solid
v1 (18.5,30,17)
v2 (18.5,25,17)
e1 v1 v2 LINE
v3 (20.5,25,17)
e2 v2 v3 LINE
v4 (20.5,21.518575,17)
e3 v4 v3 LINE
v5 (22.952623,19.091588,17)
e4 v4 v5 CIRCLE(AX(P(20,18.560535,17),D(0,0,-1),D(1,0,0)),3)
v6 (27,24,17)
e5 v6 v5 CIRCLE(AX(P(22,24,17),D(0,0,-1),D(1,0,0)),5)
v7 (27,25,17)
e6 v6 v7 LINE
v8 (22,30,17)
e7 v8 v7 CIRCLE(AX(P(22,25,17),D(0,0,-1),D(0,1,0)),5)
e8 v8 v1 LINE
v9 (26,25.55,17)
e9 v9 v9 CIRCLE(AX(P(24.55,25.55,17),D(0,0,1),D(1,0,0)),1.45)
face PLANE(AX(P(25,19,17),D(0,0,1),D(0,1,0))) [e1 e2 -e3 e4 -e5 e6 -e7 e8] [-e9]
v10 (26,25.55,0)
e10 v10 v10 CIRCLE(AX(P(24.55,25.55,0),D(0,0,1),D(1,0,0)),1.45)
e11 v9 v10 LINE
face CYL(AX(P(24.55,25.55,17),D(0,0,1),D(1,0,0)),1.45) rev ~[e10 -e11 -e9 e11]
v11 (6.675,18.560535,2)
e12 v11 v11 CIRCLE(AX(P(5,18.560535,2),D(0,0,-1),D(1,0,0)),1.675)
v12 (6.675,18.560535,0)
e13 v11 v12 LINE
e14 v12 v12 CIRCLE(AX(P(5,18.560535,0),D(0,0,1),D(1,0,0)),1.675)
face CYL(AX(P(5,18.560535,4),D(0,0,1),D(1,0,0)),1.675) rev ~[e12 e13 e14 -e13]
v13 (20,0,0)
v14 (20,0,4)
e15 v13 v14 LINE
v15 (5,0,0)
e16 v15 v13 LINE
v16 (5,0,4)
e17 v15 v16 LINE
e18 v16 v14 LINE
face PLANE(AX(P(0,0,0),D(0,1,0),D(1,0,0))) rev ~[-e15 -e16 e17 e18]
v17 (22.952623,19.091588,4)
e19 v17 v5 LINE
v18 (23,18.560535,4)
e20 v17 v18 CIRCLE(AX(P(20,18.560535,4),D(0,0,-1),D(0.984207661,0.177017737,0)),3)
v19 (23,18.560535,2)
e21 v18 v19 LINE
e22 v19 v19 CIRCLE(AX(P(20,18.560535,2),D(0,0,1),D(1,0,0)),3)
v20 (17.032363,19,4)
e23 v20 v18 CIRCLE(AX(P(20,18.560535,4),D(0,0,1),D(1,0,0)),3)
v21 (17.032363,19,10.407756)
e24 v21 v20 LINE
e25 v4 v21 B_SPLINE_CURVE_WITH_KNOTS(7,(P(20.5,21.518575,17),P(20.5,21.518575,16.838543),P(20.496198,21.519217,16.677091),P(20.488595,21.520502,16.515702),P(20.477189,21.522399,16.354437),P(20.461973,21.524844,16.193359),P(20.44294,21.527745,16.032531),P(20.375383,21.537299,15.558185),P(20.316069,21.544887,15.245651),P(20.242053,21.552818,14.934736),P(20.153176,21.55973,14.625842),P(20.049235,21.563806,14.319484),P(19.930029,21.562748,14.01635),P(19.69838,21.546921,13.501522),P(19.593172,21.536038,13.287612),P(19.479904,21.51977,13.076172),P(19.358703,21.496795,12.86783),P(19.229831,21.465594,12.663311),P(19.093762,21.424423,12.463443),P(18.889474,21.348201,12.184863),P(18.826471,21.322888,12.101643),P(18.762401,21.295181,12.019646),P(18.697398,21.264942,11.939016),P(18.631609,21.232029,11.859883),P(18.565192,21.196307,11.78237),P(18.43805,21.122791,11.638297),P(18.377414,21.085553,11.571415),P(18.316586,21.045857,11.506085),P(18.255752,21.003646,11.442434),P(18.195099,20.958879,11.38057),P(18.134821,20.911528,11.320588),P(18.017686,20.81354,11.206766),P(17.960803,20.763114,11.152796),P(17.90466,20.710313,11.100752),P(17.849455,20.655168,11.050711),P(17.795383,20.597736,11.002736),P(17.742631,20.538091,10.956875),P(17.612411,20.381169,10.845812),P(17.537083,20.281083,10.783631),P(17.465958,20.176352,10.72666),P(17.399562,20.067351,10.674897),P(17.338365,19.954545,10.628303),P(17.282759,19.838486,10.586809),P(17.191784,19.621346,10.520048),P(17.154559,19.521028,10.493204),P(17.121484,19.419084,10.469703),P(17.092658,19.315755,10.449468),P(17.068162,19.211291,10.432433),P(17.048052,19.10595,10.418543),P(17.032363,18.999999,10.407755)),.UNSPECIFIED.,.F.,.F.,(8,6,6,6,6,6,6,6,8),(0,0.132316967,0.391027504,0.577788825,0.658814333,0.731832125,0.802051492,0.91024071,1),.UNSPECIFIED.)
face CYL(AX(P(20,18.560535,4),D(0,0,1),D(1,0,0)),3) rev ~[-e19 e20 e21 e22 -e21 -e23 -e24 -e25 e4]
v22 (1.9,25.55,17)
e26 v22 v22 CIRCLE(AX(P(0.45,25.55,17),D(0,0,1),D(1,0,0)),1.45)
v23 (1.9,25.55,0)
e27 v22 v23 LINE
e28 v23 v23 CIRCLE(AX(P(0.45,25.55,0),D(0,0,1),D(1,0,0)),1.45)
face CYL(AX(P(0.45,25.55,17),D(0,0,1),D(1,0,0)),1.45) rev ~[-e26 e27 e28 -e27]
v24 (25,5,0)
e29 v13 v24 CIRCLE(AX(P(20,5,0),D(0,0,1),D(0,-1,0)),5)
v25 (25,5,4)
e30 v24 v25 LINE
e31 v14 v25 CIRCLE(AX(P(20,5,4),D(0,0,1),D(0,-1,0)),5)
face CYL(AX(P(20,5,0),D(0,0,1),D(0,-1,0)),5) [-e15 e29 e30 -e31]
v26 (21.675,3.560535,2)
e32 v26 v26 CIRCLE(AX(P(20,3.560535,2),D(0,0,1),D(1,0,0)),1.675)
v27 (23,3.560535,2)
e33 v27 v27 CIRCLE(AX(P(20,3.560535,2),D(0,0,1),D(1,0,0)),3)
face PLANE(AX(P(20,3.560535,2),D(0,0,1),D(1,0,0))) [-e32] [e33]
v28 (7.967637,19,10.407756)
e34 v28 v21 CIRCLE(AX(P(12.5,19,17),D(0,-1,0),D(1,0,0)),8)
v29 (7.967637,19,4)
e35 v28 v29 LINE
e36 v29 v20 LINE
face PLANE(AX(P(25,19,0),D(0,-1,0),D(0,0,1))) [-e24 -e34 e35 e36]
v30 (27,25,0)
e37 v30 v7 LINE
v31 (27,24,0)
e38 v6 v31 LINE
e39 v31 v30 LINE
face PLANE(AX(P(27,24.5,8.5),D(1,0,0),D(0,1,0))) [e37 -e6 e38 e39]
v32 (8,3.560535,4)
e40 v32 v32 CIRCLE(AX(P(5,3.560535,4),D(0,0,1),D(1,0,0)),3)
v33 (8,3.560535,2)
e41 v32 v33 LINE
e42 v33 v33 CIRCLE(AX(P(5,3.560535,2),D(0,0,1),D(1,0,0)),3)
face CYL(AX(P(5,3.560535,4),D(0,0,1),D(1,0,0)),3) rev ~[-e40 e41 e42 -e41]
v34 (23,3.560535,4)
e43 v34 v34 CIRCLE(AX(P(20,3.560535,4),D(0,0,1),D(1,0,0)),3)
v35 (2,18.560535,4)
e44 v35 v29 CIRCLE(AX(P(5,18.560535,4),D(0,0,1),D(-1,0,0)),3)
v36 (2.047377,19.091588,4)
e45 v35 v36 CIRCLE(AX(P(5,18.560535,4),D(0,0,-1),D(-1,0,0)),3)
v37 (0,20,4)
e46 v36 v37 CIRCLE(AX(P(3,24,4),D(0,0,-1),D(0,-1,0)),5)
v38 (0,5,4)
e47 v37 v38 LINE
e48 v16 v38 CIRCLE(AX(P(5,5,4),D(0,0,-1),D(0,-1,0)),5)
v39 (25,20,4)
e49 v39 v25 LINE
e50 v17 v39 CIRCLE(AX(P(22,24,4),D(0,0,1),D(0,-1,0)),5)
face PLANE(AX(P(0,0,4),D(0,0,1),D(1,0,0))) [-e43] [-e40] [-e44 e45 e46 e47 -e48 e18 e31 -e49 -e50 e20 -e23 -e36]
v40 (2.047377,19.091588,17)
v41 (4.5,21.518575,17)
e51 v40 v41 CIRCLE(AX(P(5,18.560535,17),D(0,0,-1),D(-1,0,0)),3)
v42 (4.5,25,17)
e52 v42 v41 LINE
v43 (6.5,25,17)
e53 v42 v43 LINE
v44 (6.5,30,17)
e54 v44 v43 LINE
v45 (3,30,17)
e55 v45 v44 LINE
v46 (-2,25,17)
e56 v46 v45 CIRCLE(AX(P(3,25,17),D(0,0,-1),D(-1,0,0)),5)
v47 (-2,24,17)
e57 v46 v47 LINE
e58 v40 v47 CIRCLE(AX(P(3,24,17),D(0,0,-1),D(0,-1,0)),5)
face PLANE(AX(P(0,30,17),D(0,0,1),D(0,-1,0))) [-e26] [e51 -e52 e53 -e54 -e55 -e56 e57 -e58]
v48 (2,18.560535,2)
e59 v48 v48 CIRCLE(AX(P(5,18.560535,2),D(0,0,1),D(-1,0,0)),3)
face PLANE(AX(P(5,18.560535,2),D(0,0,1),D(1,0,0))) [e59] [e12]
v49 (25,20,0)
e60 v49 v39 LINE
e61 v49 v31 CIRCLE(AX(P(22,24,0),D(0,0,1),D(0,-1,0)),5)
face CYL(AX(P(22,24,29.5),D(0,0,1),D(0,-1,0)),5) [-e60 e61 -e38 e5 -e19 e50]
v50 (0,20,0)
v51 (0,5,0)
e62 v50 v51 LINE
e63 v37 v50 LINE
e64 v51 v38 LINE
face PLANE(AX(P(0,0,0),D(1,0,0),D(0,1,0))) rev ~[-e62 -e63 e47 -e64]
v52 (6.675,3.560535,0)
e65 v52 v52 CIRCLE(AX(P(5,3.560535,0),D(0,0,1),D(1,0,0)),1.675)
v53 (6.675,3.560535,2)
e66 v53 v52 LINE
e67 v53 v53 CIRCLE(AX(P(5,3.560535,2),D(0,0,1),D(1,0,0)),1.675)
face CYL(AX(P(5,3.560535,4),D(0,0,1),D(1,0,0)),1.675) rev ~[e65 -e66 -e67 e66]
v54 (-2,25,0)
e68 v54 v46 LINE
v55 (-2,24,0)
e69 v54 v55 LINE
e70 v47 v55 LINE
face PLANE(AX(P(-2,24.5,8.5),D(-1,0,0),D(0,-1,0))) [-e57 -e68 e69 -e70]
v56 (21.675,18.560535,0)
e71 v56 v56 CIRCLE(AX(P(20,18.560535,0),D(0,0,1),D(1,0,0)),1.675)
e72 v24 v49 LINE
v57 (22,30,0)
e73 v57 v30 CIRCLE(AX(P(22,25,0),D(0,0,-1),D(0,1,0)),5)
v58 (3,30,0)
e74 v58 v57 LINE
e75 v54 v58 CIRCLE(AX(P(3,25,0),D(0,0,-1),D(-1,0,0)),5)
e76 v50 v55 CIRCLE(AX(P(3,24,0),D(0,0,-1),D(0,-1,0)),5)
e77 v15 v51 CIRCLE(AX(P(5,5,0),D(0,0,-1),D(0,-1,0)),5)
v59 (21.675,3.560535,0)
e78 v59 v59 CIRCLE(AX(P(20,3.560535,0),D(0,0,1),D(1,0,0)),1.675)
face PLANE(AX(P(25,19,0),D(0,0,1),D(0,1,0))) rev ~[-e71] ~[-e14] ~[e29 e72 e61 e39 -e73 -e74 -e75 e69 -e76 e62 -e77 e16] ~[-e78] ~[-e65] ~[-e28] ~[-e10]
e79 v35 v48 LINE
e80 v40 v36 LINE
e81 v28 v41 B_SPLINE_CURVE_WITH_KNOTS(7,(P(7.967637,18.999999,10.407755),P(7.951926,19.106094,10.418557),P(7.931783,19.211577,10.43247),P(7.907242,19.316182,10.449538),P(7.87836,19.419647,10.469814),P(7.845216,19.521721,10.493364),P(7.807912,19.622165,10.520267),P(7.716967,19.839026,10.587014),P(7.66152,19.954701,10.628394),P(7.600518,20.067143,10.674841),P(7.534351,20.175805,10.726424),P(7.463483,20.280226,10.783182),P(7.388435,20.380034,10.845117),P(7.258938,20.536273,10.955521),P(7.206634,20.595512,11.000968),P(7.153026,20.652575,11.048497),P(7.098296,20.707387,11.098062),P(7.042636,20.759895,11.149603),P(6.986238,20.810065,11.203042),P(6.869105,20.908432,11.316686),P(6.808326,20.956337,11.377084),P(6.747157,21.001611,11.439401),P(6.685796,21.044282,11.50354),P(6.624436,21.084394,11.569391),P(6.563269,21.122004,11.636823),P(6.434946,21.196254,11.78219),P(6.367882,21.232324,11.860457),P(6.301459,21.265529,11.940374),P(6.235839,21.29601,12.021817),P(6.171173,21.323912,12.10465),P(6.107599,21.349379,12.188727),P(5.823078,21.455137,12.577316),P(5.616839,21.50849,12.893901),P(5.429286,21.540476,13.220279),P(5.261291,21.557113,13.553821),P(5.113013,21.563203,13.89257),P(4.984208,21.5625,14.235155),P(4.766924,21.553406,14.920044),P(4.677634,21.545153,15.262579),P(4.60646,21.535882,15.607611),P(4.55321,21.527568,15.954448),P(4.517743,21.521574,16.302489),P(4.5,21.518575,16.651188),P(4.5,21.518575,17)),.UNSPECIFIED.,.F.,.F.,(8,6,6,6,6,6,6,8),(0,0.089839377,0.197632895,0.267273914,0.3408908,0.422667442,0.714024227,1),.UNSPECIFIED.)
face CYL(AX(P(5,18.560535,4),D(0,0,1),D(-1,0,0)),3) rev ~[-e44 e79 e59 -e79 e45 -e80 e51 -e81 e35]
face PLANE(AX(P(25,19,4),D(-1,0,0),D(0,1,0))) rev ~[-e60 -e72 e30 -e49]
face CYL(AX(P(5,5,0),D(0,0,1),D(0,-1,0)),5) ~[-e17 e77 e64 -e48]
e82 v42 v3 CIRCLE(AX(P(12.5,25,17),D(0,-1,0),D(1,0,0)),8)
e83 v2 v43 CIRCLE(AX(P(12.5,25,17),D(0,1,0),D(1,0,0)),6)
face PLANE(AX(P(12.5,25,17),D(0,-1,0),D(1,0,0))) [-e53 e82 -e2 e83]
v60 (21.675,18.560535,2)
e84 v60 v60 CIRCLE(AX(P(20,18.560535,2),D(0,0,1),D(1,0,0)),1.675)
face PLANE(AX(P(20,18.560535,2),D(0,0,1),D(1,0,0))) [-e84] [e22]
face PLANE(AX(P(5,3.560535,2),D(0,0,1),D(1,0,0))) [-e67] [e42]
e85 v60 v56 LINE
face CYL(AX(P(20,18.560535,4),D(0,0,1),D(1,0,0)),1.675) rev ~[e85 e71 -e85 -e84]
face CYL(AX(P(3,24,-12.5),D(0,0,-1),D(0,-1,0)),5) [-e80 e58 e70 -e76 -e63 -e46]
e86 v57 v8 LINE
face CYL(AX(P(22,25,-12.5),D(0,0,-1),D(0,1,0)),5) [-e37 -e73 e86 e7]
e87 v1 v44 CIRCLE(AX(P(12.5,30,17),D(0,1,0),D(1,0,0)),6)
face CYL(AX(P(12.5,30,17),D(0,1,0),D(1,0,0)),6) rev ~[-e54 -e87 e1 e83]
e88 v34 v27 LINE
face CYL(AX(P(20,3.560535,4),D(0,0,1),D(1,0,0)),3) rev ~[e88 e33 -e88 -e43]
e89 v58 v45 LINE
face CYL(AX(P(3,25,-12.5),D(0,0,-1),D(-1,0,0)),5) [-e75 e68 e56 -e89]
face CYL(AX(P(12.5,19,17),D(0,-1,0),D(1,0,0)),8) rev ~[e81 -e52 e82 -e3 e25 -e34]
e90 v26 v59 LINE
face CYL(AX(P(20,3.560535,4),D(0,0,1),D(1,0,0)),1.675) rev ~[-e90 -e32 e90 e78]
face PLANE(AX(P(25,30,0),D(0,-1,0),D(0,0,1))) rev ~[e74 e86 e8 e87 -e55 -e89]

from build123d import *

# Parameters (mm, degrees)
F0_W          = 25
F0_H          = 30
F1_DEPTH      = 4
F2_R          = 1.675
F3_DEPTH      = 25
F4_W          = 25
F4_H          = 11
F5_DEPTH      = 13
F7_DEPTH      = 6
F8_R          = 8
F9_DEPTH      = 6
F2_R_2        = 3
F10_DEPTH     = 2
F11_W         = 11
F11_H         = 17
F12_DEPTH     = 2
F13_R         = 5
F14_W         = 11
F14_H         = 17
F15_DEPTH     = 2
F16_DEPTH     = 2
F17_R         = 1.45
F18_DEPTH     = 25
F19_T1_DEPTH  = 42
F19_T6_DEPTH  = 42
F19_T11_DEPTH = 42
F19_T16_DEPTH = 42
F19_T21_DEPTH = 42
F20_DEPTH     = 25


# Not quite as in the source:
# - a fillet or chamfer that OpenCascade refuses, or shapes differently, is made with other operations: its cross-section is extruded or revolved along the edge and cut away or added


with BuildPart() as f1:
    # F0 (on Top) → F1 (new body)
    with BuildSketch(Plane.XY):
        with Locations((12.5, 15)):
            Rectangle(F0_W, F0_H)
    extrude(amount=F1_DEPTH)

    # F2 (on face) → F3 (cut)
    with BuildSketch(Plane.XY.offset(4)):
        with BuildLine():
            ThreePointArc((3.325, 18.5605346784), (5, 16.8855346784), (6.675, 18.5605346784))
            ThreePointArc((6.675, 18.5605346784), (5, 20.2355346784), (3.325, 18.5605346784))
        make_face()
        with Locations((20, 18.5605346784)):
            Circle(F2_R)
        with Locations((20, 3.5605346784)):
            Circle(F2_R)
        with Locations((5, 3.5605346784)):
            Circle(F2_R)
    extrude(amount=-F3_DEPTH, mode=Mode.SUBTRACT)

    # F4 (on face) → F5 (join)
    with BuildSketch(Plane.XY.offset(4)):
        with Locations((12.5, 24.5)):
            Rectangle(F4_W, F4_H)
    extrude(amount=F5_DEPTH)

    # F6 (on face) → F7 (cut)
    with BuildSketch(Plane(origin=(0, 30, 0), x_dir=(-1, 0, 0), z_dir=(0, 1, 0))):
        with BuildLine():
            ThreePointArc((-18.5, 17), (-12.5, 11), (-6.5, 17))
            Line((-6.5, 17), (-18.5, 17))
        make_face()
    extrude(amount=-F7_DEPTH, mode=Mode.SUBTRACT)

    # F8 (on face) → F9 (cut)
    with BuildSketch(Plane.XZ.offset(-19)):
        with Locations((12.5, 17)):
            Circle(F8_R)
    extrude(amount=-F9_DEPTH, mode=Mode.SUBTRACT)

    # F2 (on face) → F10 (cut)
    with BuildSketch(Plane.XY.offset(4)):
        with BuildLine():
            ThreePointArc((8, 18.5605346784), (5, 21.5605346784), (2, 18.5605346784))
            ThreePointArc((2, 18.5605346784), (5, 15.5605346784), (8, 18.5605346784))
        make_face()
        with BuildLine():
            ThreePointArc((3.325, 18.5605346784), (5, 20.2355346784), (6.675, 18.5605346784))
            ThreePointArc((6.675, 18.5605346784), (5, 16.8855346784), (3.325, 18.5605346784))
        make_face(mode=Mode.SUBTRACT)
        with Locations((20, 18.5605346784)):
            Circle(F2_R_2)
        with Locations((20, 18.5605346784)):
            Circle(F2_R, mode=Mode.SUBTRACT)
        with Locations((20, 3.5605346784)):
            Circle(F2_R_2)
        with Locations((20, 3.5605346784)):
            Circle(F2_R, mode=Mode.SUBTRACT)
        with Locations((5, 3.5605346784)):
            Circle(F2_R_2)
        with Locations((5, 3.5605346784)):
            Circle(F2_R, mode=Mode.SUBTRACT)
    extrude(amount=-F10_DEPTH, mode=Mode.SUBTRACT)

    # F11 (on face) → F12 (join)
    with BuildSketch(Plane(origin=(0, 0, 0), x_dir=(0, -1, 0), z_dir=(-1, 0, 0))):
        with Locations((-24.5, 8.5)):
            Rectangle(F11_W, F11_H)
    extrude(amount=F12_DEPTH)

    # F13
    f13_edges = [f1.edges().sort_by_distance(p)[0] for p in [
        (0, 0, 2),
        (25, 0, 2),
    ]]
    fillet(f13_edges, radius=F13_R)

    # F14 (on face) → F15 (join)
    with BuildSketch(Plane.YZ.offset(25)):
        with Locations((24.5, 8.5)):
            Rectangle(F14_W, F14_H)
    extrude(amount=F15_DEPTH)

    # F14 (on face) → F16 (join)
    with BuildSketch(Plane.YZ.offset(25)):
        with Locations((24.5, 8.5)):
            Rectangle(F14_W, F14_H)
    extrude(amount=F16_DEPTH)

    # F17 (on face) → F18 (cut)
    with BuildSketch(Plane.XY.offset(17)):
        with Locations((0.45, 25.55)):
            Circle(F17_R)
        with Locations((24.55, 25.55)):
            Circle(F17_R)
    extrude(amount=-F18_DEPTH, mode=Mode.SUBTRACT)

    # F19: fillet of radius 5 on 4 edges, made by hand

    # F19_s2 → F19_t1 (cut)
    with BuildSketch(Plane.XY.offset(-12.5)):
        with BuildLine():
            ThreePointArc((-2, 25), (-0.5355339059, 28.5355339059), (3, 30))
            Line((3, 30), (-2, 30))
            Line((-2, 30), (-2, 25))
        make_face()
        with BuildLine():
            ThreePointArc((22, 30), (25.5355339059, 28.5355339059), (27, 25))
            Line((27, 25), (27, 30))
            Line((27, 30), (22, 30))
        make_face()
    extrude(amount=F19_T1_DEPTH, mode=Mode.SUBTRACT)


with BuildPart() as f19_tool4:
    # F19_s5 → F19_t6 (new body)
    with BuildSketch(Plane.XY.offset(-12.5)):
        with BuildLine():
            ThreePointArc((3, 19), (-0.5355339059, 20.4644660941), (-2, 24))
            Line((-2, 24), (-2, 19))
            Line((-2, 19), (3, 19))
        make_face()
    extrude(amount=F19_T6_DEPTH)

    split(bisect_by=Plane.YZ, keep=Keep.BOTTOM)


with BuildPart() as f1_1:
    add(f1.part)

    # F19_t3: cut F19_tool4
    add(f19_tool4.part, mode=Mode.SUBTRACT)


with BuildPart() as f19_tool9:
    # F19_s10 → F19_t11 (new body)
    with BuildSketch(Plane.XY.offset(-12.5)):
        with BuildLine():
            ThreePointArc((3, 19), (-0.5355339059, 20.4644660941), (-2, 24))
            Line((-2, 24), (-2, 19))
            Line((-2, 19), (3, 19))
        make_face()
    extrude(amount=F19_T11_DEPTH)

    split(bisect_by=Plane.XY.offset(4), keep=Keep.TOP)


with BuildPart() as f1_2:
    add(f1_1.part)

    # F19_t8: cut F19_tool9
    add(f19_tool9.part, mode=Mode.SUBTRACT)


with BuildPart() as f19_tool14:
    # F19_s15 → F19_t16 (new body)
    with BuildSketch(Plane.XY.offset(29.5)):
        with BuildLine():
            ThreePointArc((22, 19), (25.5355339059, 20.4644660941), (27, 24))
            Line((27, 24), (27, 19))
            Line((27, 19), (22, 19))
        make_face()
    extrude(amount=-F19_T16_DEPTH)

    split(bisect_by=Plane.XY.offset(4), keep=Keep.TOP)


with BuildPart() as f1_3:
    add(f1_2.part)

    # F19_t13: cut F19_tool14
    add(f19_tool14.part, mode=Mode.SUBTRACT)


with BuildPart() as f19_tool19:
    # F19_s20 → F19_t21 (new body)
    with BuildSketch(Plane.XY.offset(29.5)):
        with BuildLine():
            ThreePointArc((22, 19), (25.5355339059, 20.4644660941), (27, 24))
            Line((27, 24), (27, 19))
            Line((27, 19), (22, 19))
        make_face()
    extrude(amount=-F19_T21_DEPTH)

    split(bisect_by=Plane.YZ.offset(25), keep=Keep.TOP)


with BuildPart() as f1_4:
    add(f1_3.part)

    # F19_t18: cut F19_tool19
    add(f19_tool19.part, mode=Mode.SUBTRACT)

    # F2 (on face) → F20 (cut)
    with BuildSketch(Plane.XY.offset(4)):
        with BuildLine():
            ThreePointArc((8, 18.5605346784), (5, 21.5605346784), (2, 18.5605346784))
            ThreePointArc((2, 18.5605346784), (5, 15.5605346784), (8, 18.5605346784))
        make_face()
        with BuildLine():
            ThreePointArc((3.325, 18.5605346784), (5, 20.2355346784), (6.675, 18.5605346784))
            ThreePointArc((6.675, 18.5605346784), (5, 16.8855346784), (3.325, 18.5605346784))
        make_face(mode=Mode.SUBTRACT)
        with Locations((20, 18.5605346784)):
            Circle(F2_R_2)
        with Locations((20, 18.5605346784)):
            Circle(F2_R, mode=Mode.SUBTRACT)
        with BuildLine():
            ThreePointArc((3.325, 18.5605346784), (5, 16.8855346784), (6.675, 18.5605346784))
            ThreePointArc((6.675, 18.5605346784), (5, 20.2355346784), (3.325, 18.5605346784))
        make_face()
        with Locations((20, 18.5605346784)):
            Circle(F2_R)
    extrude(amount=F20_DEPTH, mode=Mode.SUBTRACT)


solid = f1_4.part
